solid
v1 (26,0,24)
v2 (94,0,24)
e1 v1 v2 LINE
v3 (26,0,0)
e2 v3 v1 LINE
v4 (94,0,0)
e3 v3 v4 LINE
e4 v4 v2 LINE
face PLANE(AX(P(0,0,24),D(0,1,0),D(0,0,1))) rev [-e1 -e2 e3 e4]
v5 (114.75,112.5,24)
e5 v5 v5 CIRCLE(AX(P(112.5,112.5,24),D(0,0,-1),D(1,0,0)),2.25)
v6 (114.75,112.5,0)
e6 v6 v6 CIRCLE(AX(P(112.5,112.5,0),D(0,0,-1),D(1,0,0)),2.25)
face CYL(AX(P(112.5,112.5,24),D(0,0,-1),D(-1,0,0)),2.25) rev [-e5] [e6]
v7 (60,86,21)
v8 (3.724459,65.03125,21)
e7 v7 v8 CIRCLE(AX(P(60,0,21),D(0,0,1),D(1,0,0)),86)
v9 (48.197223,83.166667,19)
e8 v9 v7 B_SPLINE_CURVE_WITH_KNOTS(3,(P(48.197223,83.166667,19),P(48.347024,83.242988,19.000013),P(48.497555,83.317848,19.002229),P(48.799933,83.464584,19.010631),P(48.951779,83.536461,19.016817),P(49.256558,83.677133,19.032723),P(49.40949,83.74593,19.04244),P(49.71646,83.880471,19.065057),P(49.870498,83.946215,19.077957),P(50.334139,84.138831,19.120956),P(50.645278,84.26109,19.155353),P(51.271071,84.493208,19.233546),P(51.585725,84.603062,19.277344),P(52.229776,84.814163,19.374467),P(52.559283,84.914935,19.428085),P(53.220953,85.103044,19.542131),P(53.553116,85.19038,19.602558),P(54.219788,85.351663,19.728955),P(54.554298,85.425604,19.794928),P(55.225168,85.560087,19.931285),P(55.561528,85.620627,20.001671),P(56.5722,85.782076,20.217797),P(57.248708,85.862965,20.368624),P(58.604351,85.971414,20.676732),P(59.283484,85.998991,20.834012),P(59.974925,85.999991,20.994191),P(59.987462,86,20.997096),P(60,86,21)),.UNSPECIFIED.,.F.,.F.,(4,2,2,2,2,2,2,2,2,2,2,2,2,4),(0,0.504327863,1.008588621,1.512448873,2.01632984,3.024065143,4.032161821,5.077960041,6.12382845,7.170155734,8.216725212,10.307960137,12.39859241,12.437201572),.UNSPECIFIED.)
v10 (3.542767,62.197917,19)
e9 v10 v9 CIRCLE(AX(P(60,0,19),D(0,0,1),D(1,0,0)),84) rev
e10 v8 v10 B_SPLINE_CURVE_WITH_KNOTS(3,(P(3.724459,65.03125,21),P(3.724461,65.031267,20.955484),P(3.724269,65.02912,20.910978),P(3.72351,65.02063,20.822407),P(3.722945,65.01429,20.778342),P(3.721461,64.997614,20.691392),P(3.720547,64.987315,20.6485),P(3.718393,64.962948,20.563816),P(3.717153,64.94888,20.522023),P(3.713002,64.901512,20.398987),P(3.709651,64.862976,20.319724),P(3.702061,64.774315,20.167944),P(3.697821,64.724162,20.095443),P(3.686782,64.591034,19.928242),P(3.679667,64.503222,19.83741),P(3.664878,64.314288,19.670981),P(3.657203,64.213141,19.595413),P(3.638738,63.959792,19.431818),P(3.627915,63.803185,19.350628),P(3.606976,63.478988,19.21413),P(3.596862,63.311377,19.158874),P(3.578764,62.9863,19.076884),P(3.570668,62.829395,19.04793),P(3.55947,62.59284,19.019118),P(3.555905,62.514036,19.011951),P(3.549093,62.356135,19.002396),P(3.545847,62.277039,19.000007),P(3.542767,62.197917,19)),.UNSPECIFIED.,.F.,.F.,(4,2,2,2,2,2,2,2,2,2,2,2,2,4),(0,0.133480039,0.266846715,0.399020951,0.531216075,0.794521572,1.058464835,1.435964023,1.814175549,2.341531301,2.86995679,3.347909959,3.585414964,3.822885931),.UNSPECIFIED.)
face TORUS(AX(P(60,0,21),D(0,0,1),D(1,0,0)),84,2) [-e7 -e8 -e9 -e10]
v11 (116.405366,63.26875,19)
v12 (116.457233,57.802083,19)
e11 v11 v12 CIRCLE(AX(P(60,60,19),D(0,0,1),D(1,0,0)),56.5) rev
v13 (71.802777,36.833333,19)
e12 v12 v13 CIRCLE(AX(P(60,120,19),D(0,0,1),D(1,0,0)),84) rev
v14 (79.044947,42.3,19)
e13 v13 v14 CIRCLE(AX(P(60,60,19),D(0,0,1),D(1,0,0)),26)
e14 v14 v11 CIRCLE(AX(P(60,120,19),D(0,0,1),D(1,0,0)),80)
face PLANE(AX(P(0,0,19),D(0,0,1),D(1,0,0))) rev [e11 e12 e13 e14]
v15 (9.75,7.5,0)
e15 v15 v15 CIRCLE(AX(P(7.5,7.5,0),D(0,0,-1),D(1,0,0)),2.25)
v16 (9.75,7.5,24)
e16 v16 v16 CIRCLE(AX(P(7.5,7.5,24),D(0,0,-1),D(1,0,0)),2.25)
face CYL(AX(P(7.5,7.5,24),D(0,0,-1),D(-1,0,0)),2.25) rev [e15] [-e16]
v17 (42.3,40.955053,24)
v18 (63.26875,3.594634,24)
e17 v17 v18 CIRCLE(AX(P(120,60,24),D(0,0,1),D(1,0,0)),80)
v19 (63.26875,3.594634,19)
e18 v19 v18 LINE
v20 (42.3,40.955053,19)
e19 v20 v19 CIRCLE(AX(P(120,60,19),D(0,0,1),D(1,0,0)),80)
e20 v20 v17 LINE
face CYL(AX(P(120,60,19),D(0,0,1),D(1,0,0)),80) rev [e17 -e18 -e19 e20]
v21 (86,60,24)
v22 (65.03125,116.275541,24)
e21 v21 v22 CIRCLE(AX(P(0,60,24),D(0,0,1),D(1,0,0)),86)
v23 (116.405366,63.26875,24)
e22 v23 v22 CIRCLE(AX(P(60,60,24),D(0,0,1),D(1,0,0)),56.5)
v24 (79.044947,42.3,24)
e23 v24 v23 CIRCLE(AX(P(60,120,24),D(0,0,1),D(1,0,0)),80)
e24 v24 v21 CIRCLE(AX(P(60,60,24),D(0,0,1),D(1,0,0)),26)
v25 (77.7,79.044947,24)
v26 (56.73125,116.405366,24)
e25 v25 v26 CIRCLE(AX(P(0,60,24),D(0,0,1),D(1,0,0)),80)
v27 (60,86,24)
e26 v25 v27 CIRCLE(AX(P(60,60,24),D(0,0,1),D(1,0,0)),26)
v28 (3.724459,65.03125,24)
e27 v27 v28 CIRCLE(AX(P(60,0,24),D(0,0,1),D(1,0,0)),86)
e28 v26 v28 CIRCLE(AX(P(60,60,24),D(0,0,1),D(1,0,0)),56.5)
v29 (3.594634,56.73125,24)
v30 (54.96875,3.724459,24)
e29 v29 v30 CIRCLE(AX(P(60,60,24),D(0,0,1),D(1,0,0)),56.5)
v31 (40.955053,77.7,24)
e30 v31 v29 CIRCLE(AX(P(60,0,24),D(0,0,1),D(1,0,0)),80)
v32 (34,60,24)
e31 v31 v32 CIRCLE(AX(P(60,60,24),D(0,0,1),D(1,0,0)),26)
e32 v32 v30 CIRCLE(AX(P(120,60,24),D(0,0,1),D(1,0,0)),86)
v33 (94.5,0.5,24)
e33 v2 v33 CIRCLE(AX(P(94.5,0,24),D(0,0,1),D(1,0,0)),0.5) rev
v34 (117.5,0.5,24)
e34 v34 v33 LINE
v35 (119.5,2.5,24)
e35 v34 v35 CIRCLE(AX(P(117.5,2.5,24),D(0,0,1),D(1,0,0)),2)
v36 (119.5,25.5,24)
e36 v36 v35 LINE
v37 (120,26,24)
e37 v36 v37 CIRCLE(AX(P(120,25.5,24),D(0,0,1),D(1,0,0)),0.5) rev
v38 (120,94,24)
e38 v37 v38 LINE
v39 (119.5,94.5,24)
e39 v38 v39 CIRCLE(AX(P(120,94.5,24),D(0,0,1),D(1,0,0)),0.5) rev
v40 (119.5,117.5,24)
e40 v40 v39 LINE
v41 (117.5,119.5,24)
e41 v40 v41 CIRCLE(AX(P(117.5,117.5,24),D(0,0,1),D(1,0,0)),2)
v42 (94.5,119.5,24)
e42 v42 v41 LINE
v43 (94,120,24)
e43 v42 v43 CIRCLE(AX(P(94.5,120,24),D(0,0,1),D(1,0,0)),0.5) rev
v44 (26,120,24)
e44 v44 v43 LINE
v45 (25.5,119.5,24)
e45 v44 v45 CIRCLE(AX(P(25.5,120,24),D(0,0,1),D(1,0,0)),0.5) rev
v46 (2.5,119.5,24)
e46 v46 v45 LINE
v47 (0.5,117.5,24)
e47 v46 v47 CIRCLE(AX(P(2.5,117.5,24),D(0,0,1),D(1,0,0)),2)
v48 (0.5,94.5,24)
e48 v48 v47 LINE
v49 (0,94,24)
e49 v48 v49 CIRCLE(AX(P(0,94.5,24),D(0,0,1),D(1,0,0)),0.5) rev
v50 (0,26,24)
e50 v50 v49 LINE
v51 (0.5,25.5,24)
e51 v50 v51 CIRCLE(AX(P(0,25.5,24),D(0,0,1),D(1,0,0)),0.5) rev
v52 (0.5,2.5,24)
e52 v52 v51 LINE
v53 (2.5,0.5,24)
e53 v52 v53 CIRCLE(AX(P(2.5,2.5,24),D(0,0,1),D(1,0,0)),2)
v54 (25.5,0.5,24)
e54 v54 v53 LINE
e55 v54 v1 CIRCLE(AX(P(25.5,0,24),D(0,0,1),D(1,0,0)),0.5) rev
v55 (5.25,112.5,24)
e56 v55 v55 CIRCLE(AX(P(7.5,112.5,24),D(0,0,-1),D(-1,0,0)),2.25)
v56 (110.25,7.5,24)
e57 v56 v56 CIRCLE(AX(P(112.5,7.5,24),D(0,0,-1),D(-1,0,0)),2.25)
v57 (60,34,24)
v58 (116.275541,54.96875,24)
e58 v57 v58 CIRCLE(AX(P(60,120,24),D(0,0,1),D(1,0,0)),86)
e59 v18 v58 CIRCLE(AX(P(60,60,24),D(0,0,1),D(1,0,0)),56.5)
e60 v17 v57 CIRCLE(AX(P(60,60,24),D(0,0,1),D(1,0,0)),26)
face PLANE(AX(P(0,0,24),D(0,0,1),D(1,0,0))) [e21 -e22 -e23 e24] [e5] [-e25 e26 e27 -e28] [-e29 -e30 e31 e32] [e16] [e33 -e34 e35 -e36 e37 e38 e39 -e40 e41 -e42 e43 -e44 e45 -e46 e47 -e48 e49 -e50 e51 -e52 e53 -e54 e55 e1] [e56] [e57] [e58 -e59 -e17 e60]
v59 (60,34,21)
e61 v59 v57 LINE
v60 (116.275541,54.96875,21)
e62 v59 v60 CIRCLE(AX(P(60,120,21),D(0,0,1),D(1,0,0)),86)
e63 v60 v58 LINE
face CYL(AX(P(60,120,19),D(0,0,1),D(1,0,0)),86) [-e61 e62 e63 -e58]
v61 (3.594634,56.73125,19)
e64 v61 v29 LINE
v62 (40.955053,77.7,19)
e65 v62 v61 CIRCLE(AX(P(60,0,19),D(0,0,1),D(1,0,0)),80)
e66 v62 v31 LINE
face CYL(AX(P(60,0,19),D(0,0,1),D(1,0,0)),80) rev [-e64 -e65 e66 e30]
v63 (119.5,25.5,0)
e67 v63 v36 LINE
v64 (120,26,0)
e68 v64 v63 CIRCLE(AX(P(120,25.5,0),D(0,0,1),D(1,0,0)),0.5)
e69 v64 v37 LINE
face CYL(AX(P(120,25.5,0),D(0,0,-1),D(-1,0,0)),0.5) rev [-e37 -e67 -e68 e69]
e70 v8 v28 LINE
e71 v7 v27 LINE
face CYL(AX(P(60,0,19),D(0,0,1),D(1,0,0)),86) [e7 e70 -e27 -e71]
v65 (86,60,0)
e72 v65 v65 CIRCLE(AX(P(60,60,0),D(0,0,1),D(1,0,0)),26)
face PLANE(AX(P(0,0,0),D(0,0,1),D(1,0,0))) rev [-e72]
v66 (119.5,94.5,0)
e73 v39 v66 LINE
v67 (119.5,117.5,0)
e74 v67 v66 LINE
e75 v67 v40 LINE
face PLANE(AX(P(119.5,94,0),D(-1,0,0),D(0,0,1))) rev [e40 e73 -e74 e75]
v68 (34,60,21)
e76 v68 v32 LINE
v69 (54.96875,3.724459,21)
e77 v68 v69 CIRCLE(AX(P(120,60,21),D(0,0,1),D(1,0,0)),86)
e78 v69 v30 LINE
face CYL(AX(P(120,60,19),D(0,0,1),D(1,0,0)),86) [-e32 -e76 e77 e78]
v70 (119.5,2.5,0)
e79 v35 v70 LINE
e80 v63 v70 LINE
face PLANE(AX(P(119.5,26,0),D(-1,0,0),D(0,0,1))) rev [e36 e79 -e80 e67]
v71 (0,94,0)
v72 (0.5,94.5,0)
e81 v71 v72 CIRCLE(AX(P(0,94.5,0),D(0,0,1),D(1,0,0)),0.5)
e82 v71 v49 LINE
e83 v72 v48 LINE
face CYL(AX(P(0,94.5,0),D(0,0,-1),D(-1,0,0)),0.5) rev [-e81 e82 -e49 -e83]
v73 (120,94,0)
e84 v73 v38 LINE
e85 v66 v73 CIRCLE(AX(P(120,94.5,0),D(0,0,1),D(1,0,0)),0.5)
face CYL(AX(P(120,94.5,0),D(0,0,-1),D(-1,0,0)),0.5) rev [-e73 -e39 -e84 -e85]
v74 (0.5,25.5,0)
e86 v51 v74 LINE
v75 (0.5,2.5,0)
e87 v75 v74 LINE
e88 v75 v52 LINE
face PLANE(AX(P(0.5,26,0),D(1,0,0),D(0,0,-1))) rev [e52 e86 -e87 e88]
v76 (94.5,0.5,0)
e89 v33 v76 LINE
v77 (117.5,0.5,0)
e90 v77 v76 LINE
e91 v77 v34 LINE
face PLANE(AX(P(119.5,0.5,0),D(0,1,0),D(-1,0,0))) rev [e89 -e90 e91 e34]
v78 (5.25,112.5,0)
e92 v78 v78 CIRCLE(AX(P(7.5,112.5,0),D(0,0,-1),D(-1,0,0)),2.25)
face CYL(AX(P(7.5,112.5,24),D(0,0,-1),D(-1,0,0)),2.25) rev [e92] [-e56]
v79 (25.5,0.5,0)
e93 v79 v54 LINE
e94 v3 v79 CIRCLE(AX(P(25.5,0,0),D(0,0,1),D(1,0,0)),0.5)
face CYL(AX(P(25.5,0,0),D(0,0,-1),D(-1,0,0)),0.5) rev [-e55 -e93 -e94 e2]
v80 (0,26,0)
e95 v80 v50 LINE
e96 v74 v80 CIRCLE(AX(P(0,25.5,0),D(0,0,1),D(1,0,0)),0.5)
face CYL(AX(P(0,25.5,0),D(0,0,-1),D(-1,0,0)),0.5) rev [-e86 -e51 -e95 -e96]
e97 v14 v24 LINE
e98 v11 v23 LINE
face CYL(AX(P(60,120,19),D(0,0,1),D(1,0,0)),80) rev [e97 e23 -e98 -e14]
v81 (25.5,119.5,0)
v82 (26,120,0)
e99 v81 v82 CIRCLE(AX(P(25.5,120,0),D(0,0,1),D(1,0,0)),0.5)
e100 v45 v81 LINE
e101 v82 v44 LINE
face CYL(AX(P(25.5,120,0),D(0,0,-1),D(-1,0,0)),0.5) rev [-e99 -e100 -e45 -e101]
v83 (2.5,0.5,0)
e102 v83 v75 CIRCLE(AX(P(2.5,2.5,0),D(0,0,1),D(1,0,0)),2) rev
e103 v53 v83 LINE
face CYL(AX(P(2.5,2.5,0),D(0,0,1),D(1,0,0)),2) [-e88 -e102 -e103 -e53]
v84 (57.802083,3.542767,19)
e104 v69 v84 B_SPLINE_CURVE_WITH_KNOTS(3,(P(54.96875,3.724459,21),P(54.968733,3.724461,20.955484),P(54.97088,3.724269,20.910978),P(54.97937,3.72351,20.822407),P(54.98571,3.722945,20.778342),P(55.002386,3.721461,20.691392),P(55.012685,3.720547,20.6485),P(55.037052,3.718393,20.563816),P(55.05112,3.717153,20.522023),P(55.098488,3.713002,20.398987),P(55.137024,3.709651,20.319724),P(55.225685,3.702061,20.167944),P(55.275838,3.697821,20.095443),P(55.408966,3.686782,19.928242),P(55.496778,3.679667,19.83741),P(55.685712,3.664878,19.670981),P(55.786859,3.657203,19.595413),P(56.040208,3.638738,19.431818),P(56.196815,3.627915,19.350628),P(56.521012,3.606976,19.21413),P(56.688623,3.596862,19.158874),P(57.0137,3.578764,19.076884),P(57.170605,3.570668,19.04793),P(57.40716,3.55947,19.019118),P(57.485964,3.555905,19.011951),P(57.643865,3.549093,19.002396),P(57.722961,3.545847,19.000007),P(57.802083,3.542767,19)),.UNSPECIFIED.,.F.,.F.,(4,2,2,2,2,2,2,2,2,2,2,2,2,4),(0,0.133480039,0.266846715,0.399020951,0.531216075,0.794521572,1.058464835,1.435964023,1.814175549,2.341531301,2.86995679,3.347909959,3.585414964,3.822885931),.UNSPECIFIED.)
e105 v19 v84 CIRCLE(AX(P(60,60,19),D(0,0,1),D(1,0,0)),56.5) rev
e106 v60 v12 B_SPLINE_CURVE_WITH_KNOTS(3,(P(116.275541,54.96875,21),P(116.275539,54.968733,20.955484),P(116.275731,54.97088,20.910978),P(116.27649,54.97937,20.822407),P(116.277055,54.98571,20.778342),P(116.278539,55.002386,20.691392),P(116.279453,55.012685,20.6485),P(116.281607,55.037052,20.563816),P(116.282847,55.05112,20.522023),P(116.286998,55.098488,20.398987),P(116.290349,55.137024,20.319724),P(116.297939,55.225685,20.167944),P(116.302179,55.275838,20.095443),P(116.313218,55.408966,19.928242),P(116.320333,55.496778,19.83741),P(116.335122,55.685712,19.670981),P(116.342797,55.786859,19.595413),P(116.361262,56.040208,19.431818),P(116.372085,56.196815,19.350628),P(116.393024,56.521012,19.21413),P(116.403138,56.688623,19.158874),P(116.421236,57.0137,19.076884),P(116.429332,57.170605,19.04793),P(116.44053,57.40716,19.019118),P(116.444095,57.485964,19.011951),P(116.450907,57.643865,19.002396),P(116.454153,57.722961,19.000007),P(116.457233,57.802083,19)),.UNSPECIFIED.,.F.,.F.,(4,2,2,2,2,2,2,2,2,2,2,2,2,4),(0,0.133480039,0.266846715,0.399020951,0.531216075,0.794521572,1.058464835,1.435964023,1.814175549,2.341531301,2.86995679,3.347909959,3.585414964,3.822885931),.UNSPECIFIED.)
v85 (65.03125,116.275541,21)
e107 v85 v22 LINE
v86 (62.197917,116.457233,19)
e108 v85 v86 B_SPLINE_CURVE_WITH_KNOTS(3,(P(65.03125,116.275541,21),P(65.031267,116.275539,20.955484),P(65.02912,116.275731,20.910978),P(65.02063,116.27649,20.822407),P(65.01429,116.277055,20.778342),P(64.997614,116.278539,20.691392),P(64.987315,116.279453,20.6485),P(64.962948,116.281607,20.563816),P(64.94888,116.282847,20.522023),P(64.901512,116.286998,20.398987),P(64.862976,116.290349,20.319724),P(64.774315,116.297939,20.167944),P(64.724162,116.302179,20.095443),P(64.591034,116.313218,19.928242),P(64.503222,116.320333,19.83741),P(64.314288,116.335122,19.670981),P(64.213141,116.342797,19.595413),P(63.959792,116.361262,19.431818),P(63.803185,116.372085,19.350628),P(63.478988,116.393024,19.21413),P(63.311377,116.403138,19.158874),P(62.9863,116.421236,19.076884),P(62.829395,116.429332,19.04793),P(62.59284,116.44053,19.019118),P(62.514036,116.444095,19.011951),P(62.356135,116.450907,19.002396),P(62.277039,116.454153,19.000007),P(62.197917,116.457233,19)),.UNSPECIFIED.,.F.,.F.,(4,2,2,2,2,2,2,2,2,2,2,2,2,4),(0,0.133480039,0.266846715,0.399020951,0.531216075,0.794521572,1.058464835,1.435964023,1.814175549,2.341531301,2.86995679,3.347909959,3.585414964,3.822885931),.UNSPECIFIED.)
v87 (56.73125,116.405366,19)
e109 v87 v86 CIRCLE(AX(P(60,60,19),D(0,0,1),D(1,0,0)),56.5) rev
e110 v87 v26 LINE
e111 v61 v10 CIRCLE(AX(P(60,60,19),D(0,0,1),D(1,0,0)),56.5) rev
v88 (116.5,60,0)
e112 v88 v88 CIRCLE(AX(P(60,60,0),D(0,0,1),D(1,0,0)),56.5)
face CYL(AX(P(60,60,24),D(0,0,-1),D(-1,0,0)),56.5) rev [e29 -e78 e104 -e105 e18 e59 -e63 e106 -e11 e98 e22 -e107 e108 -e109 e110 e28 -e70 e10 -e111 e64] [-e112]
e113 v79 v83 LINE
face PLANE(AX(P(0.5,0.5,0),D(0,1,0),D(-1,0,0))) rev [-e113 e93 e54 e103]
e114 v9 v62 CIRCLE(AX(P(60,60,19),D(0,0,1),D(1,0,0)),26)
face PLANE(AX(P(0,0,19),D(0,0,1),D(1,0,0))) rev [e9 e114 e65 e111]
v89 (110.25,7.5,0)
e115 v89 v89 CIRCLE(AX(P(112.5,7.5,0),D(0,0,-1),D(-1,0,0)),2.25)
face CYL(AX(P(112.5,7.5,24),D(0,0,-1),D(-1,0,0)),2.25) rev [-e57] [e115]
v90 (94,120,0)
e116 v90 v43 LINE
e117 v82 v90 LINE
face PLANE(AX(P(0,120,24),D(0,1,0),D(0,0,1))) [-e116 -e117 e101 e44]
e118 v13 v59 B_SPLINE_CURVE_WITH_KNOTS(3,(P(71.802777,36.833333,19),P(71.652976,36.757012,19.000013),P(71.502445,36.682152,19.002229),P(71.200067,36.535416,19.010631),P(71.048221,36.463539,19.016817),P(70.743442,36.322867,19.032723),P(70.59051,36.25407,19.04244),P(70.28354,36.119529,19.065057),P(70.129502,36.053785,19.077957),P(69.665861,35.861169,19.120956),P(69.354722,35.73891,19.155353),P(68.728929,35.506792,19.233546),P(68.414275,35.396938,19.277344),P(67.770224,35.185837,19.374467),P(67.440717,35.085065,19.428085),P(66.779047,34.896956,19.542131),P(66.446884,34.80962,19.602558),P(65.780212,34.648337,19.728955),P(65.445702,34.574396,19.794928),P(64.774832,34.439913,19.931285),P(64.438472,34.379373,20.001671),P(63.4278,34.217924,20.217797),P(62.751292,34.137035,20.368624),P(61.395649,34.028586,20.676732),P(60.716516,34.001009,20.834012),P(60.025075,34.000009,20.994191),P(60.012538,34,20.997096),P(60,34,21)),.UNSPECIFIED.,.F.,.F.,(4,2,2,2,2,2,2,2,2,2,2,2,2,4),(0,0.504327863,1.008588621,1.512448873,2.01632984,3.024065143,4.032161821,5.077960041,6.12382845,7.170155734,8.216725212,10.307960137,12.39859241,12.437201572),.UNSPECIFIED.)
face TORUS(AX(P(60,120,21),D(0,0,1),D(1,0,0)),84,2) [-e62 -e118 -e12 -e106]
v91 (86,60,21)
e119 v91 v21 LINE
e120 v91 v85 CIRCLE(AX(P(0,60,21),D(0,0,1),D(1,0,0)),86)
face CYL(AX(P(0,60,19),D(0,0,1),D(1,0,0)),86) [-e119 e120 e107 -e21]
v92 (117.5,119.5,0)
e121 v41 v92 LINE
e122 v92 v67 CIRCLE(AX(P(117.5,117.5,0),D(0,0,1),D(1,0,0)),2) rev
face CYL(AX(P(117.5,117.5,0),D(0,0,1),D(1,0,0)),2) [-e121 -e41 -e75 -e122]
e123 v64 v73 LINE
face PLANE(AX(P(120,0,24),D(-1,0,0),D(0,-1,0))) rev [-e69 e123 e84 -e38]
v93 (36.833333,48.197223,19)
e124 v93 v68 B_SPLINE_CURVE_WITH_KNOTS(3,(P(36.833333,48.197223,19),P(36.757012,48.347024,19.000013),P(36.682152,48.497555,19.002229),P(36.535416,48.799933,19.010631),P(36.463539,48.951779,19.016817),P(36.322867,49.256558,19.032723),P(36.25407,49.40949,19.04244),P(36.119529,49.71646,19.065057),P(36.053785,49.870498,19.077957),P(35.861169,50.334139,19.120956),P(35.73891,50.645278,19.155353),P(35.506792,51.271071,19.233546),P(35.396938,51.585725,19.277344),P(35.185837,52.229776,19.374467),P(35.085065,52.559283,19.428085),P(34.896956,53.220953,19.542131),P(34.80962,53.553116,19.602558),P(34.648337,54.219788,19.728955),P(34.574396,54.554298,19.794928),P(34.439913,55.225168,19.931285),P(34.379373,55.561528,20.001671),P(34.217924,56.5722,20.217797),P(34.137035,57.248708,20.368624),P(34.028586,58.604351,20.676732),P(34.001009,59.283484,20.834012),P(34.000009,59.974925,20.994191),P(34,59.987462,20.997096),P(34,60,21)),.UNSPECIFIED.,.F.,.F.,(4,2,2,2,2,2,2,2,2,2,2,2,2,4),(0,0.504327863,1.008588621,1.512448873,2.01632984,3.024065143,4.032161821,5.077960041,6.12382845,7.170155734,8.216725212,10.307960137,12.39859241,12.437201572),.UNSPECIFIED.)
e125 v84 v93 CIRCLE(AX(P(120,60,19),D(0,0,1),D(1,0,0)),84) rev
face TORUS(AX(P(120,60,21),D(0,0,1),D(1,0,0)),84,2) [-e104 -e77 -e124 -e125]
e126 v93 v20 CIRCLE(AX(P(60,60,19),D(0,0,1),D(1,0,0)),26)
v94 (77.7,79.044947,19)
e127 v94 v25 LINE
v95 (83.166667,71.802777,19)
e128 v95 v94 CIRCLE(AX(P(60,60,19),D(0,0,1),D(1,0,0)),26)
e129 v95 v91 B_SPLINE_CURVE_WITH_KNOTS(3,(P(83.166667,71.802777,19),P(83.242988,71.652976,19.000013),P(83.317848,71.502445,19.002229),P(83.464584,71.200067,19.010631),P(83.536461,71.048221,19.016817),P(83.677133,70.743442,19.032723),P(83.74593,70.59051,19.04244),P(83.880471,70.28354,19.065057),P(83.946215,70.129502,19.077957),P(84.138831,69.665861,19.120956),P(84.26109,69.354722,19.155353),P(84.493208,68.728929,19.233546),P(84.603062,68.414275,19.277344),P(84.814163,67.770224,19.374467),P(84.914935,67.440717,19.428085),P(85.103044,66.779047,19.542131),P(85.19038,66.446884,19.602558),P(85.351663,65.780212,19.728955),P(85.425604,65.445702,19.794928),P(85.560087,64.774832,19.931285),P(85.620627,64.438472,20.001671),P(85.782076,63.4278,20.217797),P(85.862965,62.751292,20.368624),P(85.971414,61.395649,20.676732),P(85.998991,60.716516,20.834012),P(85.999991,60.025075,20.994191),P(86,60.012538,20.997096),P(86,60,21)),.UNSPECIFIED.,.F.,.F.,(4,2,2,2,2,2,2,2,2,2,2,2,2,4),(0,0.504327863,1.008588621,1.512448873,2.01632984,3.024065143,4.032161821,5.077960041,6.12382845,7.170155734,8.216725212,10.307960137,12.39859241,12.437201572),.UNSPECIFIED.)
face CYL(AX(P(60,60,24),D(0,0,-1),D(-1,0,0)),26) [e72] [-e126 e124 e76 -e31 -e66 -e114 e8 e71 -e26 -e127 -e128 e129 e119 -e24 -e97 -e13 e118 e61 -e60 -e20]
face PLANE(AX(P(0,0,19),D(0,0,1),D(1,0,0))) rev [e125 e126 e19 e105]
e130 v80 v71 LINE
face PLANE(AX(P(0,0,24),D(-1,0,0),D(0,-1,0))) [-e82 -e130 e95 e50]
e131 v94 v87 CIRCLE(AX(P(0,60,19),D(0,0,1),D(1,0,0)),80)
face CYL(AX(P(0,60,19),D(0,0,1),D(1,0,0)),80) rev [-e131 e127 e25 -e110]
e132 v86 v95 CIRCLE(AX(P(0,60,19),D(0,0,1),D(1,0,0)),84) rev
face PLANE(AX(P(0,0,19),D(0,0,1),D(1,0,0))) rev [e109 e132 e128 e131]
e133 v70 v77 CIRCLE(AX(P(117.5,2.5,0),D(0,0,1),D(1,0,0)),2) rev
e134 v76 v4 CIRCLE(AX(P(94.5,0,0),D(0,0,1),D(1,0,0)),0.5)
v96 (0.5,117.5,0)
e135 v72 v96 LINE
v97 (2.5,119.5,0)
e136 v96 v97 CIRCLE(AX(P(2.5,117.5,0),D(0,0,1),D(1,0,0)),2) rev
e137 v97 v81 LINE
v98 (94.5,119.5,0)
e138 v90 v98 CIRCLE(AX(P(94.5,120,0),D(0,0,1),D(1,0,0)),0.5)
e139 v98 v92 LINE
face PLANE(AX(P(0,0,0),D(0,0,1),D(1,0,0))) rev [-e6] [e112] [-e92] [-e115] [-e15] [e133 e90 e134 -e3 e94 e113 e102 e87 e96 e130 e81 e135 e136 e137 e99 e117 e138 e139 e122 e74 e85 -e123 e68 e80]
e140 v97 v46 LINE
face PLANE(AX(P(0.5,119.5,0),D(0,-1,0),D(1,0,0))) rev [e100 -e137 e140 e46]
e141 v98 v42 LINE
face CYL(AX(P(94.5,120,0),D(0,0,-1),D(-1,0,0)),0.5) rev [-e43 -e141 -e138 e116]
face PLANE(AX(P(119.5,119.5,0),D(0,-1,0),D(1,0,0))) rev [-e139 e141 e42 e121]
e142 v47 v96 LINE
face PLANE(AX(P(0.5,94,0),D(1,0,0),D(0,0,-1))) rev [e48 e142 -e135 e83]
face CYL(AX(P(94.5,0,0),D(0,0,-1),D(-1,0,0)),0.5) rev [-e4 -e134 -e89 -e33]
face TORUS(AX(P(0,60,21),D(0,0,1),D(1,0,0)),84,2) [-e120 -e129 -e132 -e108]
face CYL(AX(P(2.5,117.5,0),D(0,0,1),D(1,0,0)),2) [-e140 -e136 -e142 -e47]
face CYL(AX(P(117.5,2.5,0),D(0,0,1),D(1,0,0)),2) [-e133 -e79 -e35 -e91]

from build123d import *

# Parameters (mm, degrees)
ESQUISSE1_R             = 56.5
BOSS_EXTRU_1_DEPTH      = 24
ESQUISSE1_R_2           = 26
BOSS_EXTRU_1_2_DEPTH    = 24
ENL_V_MAT_EXTRU_1_DEPTH = 172.394282285
CONG_1_R                = 0.5
CONG_2_R                = 2
BOSS_EXTRU_2_START      = -5
BOSS_EXTRU_2_DEPTH      = 5
CONG_3_R                = 2
ESQUISSE4_R             = 2.25
ENL_V_MAT_EXTRU_2_DEPTH = 172.394282299


# Some blends are built 0.0001 mm under size
with BuildPart() as part:
    # Esquisse1 → Boss.-Extru.1 (new body)
    with BuildSketch(Plane.XY):
        Polygon((0, 95), (0, 0), (120, 0), (120, 120), (32.113356809, 120), (0.4, 120), (0, 120), (0, 114.342406945), align=None)
        with Locations((60, 60)):
            Circle(ESQUISSE1_R, mode=Mode.SUBTRACT)
    extrude(amount=BOSS_EXTRU_1_DEPTH)

    # Esquisse2 → Enlèv. mat.-Extru.1 (cut, through all)
    with BuildSketch(Plane.XY.offset(24)):
        Polygon((0, 94), (0.5, 94), (0.5, 119.5), (26, 119.5), (26, 120), (0, 120), align=None)
        Polygon((26, 0.5), (26, 0), (0, 0), (0, 26), (0.5, 26), (0.5, 0.5), align=None)
        Polygon((120, 0), (94, 0), (94, 0.5), (119.5, 0.5), (119.5, 26), (120, 26), align=None)
        Polygon((120, 120), (94, 120), (94, 119.5), (119.5, 119.5), (119.5, 94), (120, 94), align=None)
    extrude(amount=-ENL_V_MAT_EXTRU_1_DEPTH, mode=Mode.SUBTRACT)

    # Congé1
    cong_1_edges = [part.edges().sort_by_distance(p)[0] for p in [
        (94, 119.5, 12),
        (119.5, 94, 12),
        (94, 0.5, 12),
        (119.5, 26, 12),
        (26, 0.5, 12),
        (0.5, 26, 12),
        (0.5, 94, 12),
        (26, 119.5, 12),
    ]]
    fillet(cong_1_edges, radius=CONG_1_R - 0.0001)  # a hair under: the kernel refuses the full size

    # Congé2
    cong_2_edges = [part.edges().sort_by_distance(p)[0] for p in [
        (119.5, 119.5, 12),
        (119.5, 0.5, 12),
        (0.5, 0.5, 12),
        (0.5, 119.5, 12),
    ]]
    fillet(cong_2_edges, radius=CONG_2_R)



with BuildPart() as body_2:
    # Esquisse1 → Boss.-Extru.1 2 (new body)
    with BuildSketch(Plane.XY):
        with Locations((60, 60)):
            Circle(ESQUISSE1_R_2)
    extrude(amount=BOSS_EXTRU_1_2_DEPTH)


with BuildPart() as part_1:
    add(part.part)

    add(body_2.part)  # Boss.-Extru.2 merges body 2
    # Esquisse3 → Boss.-Extru.2 (add)
    with BuildSketch(Plane.XY.offset(24).offset(BOSS_EXTRU_2_START)):
        with BuildLine():
            ThreePointArc((3.724458924, 65.03125), (3.506910291, 60.883637464), (3.594634356, 56.73125))
            ThreePointArc((3.594634356, 56.73125), (20.845057368, 69.763102479), (40.955053164, 77.7))
            ThreePointArc((40.955053164, 77.7), (49.612507521, 83.834848437), (60, 86))
            ThreePointArc((60, 86), (29.972408521, 80.587491275), (3.724458924, 65.03125))
        make_face()
        with BuildLine():
            ThreePointArc((65.03125, 116.275541076), (60.883637464, 116.493089709), (56.73125, 116.405365644))
            ThreePointArc((56.73125, 116.405365644), (69.763102479, 99.154942632), (77.7, 79.044946836))
            ThreePointArc((77.7, 79.044946836), (83.834848437, 70.387492479), (86, 60))
            ThreePointArc((86, 60), (80.587491275, 90.027591479), (65.03125, 116.275541076))
        make_face()
        with BuildLine():
            ThreePointArc((60, 34), (90.027591479, 39.412508725), (116.275541076, 54.96875))
            ThreePointArc((116.275541076, 54.96875), (116.443857375, 57.481872801), (116.5, 60))
            ThreePointArc((116.5, 60), (116.476336456, 61.635059802), (116.405365644, 63.26875))
            ThreePointArc((116.405365644, 63.26875), (99.154942632, 50.236897521), (79.044946836, 42.3))
            ThreePointArc((79.044946836, 42.3), (70.387492479, 36.165151563), (60, 34))
        make_face()
        with BuildLine():
            ThreePointArc((34, 60), (39.412508725, 29.972408521), (54.96875, 3.724458924))
            ThreePointArc((54.96875, 3.724458924), (59.116362536, 3.506910291), (63.26875, 3.594634356))
            ThreePointArc((63.26875, 3.594634356), (50.236897521, 20.845057368), (42.3, 40.955053164))
            ThreePointArc((42.3, 40.955053164), (36.165151563, 49.612507521), (34, 60))
        make_face()
    extrude(amount=BOSS_EXTRU_2_DEPTH)

    # Congé3
    # the kernel refuses this fillet: 2 mm, written as the material it takes off along each edge
    with BuildSketch(Plane(origin=(60, 0, 19), x_dir=(0.17354982017034465, 0.9848250910282704, 0), z_dir=(0.9848250910282704, -0.17354982017034465, 0))) as cong_3_piece_1_section:
        with BuildLine():
            CenterArc((86 - CONG_3_R, CONG_3_R), CONG_3_R, 270, 90)
            Line((86, CONG_3_R), (86, 0))
            Line((86, 0), (86 - CONG_3_R, 0))
        make_face()
    cong_3_piece_1 = revolve(axis=Axis((60, 0, 19), (0, 0, 1)), revolution_arc=54.197355046, mode=Mode.PRIVATE)
    cong_3_piece_1 = cong_3_piece_1 & Plane(origin=(60, 60, 19), x_dir=(1, 0, 0), z_dir=(0, 0, -1)) * Cylinder(56.5, 344, mode=Mode.PRIVATE)
    cong_3_piece_1 = cong_3_piece_1 - Plane(origin=(60, 60, 19), x_dir=(1, 0, 0), z_dir=(0, 0, -1)) * Cylinder(26, 344, mode=Mode.PRIVATE)
    add(cong_3_piece_1, mode=Mode.SUBTRACT)
    with BuildSketch(Plane(origin=(0, 60, 19), x_dir=(0.9848250910282706, -0.17354982017034323, 0), z_dir=(-0.17354982017034323, -0.9848250910282706, 0))) as cong_3_piece_2_section:
        with BuildLine():
            CenterArc((86 - CONG_3_R, CONG_3_R), CONG_3_R, 270, 90)
            Line((86, CONG_3_R), (86, 0))
            Line((86, 0), (86 - CONG_3_R, 0))
        make_face()
    cong_3_piece_2 = revolve(axis=Axis((0, 60, 19), (0, 0, 1)), revolution_arc=54.197355046, mode=Mode.PRIVATE)
    cong_3_piece_2 = cong_3_piece_2 & Plane(origin=(60, 60, 19), x_dir=(1, 0, 0), z_dir=(0, 0, -1)) * Cylinder(56.5, 345, mode=Mode.PRIVATE)
    cong_3_piece_2 = cong_3_piece_2 - Plane(origin=(60, 60, 19), x_dir=(1, 0, 0), z_dir=(0, 0, -1)) * Cylinder(26, 345, mode=Mode.PRIVATE)
    add(cong_3_piece_2, mode=Mode.SUBTRACT)
    with BuildSketch(Plane(origin=(60, 120, 19), x_dir=(-0.17354982017035084, -0.9848250910282692, 0), z_dir=(-0.9848250910282692, 0.17354982017035084, 0))) as cong_3_piece_3_section:
        with BuildLine():
            CenterArc((86 - CONG_3_R, CONG_3_R), CONG_3_R, 270, 90)
            Line((86, CONG_3_R), (86, 0))
            Line((86, 0), (86 - CONG_3_R, 0))
        make_face()
    cong_3_piece_3 = revolve(axis=Axis((60, 120, 19), (0, 0, 1)), revolution_arc=54.197355046, mode=Mode.PRIVATE)
    cong_3_piece_3 = cong_3_piece_3 & Plane(origin=(60, 60, 19), x_dir=(1, 0, 0), z_dir=(0, 0, -1)) * Cylinder(56.5, 344, mode=Mode.PRIVATE)
    cong_3_piece_3 = cong_3_piece_3 - Plane(origin=(60, 60, 19), x_dir=(1, 0, 0), z_dir=(0, 0, -1)) * Cylinder(26, 344, mode=Mode.PRIVATE)
    add(cong_3_piece_3, mode=Mode.SUBTRACT)
    with BuildSketch(Plane(origin=(120, 60, 19), x_dir=(-0.9848250910282709, 0.17354982017034223, 0), z_dir=(0.17354982017034223, 0.9848250910282709, 0))) as cong_3_piece_4_section:
        with BuildLine():
            CenterArc((86 - CONG_3_R, CONG_3_R), CONG_3_R, 270, 90)
            Line((86, CONG_3_R), (86, 0))
            Line((86, 0), (86 - CONG_3_R, 0))
        make_face()
    cong_3_piece_4 = revolve(axis=Axis((120, 60, 19), (0, 0, 1)), revolution_arc=54.197355046, mode=Mode.PRIVATE)
    cong_3_piece_4 = cong_3_piece_4 & Plane(origin=(60, 60, 19), x_dir=(1, 0, 0), z_dir=(0, 0, -1)) * Cylinder(56.5, 344, mode=Mode.PRIVATE)
    cong_3_piece_4 = cong_3_piece_4 - Plane(origin=(60, 60, 19), x_dir=(1, 0, 0), z_dir=(0, 0, -1)) * Cylinder(26, 344, mode=Mode.PRIVATE)
    add(cong_3_piece_4, mode=Mode.SUBTRACT)

    # Esquisse4 → Enlèv. mat.-Extru.2 (cut, through all)
    with BuildSketch(Plane(origin=(0, 0, 0), x_dir=(-1, 0, 0), z_dir=(0, 0, -1))):
        with Locations((-7.5, 112.5)):
            Circle(ESQUISSE4_R)
        with Locations(Location((-112.5, 112.5, 0), (0, 0, 180))):
            Circle(ESQUISSE4_R)
        with Locations(Location((-7.5, 7.5, 0), (0, 0, 180))):
            Circle(ESQUISSE4_R)
        with Locations((-112.5, 7.5)):
            Circle(ESQUISSE4_R)
    extrude(amount=-ENL_V_MAT_EXTRU_2_DEPTH, mode=Mode.SUBTRACT)


solid = part_1.part
